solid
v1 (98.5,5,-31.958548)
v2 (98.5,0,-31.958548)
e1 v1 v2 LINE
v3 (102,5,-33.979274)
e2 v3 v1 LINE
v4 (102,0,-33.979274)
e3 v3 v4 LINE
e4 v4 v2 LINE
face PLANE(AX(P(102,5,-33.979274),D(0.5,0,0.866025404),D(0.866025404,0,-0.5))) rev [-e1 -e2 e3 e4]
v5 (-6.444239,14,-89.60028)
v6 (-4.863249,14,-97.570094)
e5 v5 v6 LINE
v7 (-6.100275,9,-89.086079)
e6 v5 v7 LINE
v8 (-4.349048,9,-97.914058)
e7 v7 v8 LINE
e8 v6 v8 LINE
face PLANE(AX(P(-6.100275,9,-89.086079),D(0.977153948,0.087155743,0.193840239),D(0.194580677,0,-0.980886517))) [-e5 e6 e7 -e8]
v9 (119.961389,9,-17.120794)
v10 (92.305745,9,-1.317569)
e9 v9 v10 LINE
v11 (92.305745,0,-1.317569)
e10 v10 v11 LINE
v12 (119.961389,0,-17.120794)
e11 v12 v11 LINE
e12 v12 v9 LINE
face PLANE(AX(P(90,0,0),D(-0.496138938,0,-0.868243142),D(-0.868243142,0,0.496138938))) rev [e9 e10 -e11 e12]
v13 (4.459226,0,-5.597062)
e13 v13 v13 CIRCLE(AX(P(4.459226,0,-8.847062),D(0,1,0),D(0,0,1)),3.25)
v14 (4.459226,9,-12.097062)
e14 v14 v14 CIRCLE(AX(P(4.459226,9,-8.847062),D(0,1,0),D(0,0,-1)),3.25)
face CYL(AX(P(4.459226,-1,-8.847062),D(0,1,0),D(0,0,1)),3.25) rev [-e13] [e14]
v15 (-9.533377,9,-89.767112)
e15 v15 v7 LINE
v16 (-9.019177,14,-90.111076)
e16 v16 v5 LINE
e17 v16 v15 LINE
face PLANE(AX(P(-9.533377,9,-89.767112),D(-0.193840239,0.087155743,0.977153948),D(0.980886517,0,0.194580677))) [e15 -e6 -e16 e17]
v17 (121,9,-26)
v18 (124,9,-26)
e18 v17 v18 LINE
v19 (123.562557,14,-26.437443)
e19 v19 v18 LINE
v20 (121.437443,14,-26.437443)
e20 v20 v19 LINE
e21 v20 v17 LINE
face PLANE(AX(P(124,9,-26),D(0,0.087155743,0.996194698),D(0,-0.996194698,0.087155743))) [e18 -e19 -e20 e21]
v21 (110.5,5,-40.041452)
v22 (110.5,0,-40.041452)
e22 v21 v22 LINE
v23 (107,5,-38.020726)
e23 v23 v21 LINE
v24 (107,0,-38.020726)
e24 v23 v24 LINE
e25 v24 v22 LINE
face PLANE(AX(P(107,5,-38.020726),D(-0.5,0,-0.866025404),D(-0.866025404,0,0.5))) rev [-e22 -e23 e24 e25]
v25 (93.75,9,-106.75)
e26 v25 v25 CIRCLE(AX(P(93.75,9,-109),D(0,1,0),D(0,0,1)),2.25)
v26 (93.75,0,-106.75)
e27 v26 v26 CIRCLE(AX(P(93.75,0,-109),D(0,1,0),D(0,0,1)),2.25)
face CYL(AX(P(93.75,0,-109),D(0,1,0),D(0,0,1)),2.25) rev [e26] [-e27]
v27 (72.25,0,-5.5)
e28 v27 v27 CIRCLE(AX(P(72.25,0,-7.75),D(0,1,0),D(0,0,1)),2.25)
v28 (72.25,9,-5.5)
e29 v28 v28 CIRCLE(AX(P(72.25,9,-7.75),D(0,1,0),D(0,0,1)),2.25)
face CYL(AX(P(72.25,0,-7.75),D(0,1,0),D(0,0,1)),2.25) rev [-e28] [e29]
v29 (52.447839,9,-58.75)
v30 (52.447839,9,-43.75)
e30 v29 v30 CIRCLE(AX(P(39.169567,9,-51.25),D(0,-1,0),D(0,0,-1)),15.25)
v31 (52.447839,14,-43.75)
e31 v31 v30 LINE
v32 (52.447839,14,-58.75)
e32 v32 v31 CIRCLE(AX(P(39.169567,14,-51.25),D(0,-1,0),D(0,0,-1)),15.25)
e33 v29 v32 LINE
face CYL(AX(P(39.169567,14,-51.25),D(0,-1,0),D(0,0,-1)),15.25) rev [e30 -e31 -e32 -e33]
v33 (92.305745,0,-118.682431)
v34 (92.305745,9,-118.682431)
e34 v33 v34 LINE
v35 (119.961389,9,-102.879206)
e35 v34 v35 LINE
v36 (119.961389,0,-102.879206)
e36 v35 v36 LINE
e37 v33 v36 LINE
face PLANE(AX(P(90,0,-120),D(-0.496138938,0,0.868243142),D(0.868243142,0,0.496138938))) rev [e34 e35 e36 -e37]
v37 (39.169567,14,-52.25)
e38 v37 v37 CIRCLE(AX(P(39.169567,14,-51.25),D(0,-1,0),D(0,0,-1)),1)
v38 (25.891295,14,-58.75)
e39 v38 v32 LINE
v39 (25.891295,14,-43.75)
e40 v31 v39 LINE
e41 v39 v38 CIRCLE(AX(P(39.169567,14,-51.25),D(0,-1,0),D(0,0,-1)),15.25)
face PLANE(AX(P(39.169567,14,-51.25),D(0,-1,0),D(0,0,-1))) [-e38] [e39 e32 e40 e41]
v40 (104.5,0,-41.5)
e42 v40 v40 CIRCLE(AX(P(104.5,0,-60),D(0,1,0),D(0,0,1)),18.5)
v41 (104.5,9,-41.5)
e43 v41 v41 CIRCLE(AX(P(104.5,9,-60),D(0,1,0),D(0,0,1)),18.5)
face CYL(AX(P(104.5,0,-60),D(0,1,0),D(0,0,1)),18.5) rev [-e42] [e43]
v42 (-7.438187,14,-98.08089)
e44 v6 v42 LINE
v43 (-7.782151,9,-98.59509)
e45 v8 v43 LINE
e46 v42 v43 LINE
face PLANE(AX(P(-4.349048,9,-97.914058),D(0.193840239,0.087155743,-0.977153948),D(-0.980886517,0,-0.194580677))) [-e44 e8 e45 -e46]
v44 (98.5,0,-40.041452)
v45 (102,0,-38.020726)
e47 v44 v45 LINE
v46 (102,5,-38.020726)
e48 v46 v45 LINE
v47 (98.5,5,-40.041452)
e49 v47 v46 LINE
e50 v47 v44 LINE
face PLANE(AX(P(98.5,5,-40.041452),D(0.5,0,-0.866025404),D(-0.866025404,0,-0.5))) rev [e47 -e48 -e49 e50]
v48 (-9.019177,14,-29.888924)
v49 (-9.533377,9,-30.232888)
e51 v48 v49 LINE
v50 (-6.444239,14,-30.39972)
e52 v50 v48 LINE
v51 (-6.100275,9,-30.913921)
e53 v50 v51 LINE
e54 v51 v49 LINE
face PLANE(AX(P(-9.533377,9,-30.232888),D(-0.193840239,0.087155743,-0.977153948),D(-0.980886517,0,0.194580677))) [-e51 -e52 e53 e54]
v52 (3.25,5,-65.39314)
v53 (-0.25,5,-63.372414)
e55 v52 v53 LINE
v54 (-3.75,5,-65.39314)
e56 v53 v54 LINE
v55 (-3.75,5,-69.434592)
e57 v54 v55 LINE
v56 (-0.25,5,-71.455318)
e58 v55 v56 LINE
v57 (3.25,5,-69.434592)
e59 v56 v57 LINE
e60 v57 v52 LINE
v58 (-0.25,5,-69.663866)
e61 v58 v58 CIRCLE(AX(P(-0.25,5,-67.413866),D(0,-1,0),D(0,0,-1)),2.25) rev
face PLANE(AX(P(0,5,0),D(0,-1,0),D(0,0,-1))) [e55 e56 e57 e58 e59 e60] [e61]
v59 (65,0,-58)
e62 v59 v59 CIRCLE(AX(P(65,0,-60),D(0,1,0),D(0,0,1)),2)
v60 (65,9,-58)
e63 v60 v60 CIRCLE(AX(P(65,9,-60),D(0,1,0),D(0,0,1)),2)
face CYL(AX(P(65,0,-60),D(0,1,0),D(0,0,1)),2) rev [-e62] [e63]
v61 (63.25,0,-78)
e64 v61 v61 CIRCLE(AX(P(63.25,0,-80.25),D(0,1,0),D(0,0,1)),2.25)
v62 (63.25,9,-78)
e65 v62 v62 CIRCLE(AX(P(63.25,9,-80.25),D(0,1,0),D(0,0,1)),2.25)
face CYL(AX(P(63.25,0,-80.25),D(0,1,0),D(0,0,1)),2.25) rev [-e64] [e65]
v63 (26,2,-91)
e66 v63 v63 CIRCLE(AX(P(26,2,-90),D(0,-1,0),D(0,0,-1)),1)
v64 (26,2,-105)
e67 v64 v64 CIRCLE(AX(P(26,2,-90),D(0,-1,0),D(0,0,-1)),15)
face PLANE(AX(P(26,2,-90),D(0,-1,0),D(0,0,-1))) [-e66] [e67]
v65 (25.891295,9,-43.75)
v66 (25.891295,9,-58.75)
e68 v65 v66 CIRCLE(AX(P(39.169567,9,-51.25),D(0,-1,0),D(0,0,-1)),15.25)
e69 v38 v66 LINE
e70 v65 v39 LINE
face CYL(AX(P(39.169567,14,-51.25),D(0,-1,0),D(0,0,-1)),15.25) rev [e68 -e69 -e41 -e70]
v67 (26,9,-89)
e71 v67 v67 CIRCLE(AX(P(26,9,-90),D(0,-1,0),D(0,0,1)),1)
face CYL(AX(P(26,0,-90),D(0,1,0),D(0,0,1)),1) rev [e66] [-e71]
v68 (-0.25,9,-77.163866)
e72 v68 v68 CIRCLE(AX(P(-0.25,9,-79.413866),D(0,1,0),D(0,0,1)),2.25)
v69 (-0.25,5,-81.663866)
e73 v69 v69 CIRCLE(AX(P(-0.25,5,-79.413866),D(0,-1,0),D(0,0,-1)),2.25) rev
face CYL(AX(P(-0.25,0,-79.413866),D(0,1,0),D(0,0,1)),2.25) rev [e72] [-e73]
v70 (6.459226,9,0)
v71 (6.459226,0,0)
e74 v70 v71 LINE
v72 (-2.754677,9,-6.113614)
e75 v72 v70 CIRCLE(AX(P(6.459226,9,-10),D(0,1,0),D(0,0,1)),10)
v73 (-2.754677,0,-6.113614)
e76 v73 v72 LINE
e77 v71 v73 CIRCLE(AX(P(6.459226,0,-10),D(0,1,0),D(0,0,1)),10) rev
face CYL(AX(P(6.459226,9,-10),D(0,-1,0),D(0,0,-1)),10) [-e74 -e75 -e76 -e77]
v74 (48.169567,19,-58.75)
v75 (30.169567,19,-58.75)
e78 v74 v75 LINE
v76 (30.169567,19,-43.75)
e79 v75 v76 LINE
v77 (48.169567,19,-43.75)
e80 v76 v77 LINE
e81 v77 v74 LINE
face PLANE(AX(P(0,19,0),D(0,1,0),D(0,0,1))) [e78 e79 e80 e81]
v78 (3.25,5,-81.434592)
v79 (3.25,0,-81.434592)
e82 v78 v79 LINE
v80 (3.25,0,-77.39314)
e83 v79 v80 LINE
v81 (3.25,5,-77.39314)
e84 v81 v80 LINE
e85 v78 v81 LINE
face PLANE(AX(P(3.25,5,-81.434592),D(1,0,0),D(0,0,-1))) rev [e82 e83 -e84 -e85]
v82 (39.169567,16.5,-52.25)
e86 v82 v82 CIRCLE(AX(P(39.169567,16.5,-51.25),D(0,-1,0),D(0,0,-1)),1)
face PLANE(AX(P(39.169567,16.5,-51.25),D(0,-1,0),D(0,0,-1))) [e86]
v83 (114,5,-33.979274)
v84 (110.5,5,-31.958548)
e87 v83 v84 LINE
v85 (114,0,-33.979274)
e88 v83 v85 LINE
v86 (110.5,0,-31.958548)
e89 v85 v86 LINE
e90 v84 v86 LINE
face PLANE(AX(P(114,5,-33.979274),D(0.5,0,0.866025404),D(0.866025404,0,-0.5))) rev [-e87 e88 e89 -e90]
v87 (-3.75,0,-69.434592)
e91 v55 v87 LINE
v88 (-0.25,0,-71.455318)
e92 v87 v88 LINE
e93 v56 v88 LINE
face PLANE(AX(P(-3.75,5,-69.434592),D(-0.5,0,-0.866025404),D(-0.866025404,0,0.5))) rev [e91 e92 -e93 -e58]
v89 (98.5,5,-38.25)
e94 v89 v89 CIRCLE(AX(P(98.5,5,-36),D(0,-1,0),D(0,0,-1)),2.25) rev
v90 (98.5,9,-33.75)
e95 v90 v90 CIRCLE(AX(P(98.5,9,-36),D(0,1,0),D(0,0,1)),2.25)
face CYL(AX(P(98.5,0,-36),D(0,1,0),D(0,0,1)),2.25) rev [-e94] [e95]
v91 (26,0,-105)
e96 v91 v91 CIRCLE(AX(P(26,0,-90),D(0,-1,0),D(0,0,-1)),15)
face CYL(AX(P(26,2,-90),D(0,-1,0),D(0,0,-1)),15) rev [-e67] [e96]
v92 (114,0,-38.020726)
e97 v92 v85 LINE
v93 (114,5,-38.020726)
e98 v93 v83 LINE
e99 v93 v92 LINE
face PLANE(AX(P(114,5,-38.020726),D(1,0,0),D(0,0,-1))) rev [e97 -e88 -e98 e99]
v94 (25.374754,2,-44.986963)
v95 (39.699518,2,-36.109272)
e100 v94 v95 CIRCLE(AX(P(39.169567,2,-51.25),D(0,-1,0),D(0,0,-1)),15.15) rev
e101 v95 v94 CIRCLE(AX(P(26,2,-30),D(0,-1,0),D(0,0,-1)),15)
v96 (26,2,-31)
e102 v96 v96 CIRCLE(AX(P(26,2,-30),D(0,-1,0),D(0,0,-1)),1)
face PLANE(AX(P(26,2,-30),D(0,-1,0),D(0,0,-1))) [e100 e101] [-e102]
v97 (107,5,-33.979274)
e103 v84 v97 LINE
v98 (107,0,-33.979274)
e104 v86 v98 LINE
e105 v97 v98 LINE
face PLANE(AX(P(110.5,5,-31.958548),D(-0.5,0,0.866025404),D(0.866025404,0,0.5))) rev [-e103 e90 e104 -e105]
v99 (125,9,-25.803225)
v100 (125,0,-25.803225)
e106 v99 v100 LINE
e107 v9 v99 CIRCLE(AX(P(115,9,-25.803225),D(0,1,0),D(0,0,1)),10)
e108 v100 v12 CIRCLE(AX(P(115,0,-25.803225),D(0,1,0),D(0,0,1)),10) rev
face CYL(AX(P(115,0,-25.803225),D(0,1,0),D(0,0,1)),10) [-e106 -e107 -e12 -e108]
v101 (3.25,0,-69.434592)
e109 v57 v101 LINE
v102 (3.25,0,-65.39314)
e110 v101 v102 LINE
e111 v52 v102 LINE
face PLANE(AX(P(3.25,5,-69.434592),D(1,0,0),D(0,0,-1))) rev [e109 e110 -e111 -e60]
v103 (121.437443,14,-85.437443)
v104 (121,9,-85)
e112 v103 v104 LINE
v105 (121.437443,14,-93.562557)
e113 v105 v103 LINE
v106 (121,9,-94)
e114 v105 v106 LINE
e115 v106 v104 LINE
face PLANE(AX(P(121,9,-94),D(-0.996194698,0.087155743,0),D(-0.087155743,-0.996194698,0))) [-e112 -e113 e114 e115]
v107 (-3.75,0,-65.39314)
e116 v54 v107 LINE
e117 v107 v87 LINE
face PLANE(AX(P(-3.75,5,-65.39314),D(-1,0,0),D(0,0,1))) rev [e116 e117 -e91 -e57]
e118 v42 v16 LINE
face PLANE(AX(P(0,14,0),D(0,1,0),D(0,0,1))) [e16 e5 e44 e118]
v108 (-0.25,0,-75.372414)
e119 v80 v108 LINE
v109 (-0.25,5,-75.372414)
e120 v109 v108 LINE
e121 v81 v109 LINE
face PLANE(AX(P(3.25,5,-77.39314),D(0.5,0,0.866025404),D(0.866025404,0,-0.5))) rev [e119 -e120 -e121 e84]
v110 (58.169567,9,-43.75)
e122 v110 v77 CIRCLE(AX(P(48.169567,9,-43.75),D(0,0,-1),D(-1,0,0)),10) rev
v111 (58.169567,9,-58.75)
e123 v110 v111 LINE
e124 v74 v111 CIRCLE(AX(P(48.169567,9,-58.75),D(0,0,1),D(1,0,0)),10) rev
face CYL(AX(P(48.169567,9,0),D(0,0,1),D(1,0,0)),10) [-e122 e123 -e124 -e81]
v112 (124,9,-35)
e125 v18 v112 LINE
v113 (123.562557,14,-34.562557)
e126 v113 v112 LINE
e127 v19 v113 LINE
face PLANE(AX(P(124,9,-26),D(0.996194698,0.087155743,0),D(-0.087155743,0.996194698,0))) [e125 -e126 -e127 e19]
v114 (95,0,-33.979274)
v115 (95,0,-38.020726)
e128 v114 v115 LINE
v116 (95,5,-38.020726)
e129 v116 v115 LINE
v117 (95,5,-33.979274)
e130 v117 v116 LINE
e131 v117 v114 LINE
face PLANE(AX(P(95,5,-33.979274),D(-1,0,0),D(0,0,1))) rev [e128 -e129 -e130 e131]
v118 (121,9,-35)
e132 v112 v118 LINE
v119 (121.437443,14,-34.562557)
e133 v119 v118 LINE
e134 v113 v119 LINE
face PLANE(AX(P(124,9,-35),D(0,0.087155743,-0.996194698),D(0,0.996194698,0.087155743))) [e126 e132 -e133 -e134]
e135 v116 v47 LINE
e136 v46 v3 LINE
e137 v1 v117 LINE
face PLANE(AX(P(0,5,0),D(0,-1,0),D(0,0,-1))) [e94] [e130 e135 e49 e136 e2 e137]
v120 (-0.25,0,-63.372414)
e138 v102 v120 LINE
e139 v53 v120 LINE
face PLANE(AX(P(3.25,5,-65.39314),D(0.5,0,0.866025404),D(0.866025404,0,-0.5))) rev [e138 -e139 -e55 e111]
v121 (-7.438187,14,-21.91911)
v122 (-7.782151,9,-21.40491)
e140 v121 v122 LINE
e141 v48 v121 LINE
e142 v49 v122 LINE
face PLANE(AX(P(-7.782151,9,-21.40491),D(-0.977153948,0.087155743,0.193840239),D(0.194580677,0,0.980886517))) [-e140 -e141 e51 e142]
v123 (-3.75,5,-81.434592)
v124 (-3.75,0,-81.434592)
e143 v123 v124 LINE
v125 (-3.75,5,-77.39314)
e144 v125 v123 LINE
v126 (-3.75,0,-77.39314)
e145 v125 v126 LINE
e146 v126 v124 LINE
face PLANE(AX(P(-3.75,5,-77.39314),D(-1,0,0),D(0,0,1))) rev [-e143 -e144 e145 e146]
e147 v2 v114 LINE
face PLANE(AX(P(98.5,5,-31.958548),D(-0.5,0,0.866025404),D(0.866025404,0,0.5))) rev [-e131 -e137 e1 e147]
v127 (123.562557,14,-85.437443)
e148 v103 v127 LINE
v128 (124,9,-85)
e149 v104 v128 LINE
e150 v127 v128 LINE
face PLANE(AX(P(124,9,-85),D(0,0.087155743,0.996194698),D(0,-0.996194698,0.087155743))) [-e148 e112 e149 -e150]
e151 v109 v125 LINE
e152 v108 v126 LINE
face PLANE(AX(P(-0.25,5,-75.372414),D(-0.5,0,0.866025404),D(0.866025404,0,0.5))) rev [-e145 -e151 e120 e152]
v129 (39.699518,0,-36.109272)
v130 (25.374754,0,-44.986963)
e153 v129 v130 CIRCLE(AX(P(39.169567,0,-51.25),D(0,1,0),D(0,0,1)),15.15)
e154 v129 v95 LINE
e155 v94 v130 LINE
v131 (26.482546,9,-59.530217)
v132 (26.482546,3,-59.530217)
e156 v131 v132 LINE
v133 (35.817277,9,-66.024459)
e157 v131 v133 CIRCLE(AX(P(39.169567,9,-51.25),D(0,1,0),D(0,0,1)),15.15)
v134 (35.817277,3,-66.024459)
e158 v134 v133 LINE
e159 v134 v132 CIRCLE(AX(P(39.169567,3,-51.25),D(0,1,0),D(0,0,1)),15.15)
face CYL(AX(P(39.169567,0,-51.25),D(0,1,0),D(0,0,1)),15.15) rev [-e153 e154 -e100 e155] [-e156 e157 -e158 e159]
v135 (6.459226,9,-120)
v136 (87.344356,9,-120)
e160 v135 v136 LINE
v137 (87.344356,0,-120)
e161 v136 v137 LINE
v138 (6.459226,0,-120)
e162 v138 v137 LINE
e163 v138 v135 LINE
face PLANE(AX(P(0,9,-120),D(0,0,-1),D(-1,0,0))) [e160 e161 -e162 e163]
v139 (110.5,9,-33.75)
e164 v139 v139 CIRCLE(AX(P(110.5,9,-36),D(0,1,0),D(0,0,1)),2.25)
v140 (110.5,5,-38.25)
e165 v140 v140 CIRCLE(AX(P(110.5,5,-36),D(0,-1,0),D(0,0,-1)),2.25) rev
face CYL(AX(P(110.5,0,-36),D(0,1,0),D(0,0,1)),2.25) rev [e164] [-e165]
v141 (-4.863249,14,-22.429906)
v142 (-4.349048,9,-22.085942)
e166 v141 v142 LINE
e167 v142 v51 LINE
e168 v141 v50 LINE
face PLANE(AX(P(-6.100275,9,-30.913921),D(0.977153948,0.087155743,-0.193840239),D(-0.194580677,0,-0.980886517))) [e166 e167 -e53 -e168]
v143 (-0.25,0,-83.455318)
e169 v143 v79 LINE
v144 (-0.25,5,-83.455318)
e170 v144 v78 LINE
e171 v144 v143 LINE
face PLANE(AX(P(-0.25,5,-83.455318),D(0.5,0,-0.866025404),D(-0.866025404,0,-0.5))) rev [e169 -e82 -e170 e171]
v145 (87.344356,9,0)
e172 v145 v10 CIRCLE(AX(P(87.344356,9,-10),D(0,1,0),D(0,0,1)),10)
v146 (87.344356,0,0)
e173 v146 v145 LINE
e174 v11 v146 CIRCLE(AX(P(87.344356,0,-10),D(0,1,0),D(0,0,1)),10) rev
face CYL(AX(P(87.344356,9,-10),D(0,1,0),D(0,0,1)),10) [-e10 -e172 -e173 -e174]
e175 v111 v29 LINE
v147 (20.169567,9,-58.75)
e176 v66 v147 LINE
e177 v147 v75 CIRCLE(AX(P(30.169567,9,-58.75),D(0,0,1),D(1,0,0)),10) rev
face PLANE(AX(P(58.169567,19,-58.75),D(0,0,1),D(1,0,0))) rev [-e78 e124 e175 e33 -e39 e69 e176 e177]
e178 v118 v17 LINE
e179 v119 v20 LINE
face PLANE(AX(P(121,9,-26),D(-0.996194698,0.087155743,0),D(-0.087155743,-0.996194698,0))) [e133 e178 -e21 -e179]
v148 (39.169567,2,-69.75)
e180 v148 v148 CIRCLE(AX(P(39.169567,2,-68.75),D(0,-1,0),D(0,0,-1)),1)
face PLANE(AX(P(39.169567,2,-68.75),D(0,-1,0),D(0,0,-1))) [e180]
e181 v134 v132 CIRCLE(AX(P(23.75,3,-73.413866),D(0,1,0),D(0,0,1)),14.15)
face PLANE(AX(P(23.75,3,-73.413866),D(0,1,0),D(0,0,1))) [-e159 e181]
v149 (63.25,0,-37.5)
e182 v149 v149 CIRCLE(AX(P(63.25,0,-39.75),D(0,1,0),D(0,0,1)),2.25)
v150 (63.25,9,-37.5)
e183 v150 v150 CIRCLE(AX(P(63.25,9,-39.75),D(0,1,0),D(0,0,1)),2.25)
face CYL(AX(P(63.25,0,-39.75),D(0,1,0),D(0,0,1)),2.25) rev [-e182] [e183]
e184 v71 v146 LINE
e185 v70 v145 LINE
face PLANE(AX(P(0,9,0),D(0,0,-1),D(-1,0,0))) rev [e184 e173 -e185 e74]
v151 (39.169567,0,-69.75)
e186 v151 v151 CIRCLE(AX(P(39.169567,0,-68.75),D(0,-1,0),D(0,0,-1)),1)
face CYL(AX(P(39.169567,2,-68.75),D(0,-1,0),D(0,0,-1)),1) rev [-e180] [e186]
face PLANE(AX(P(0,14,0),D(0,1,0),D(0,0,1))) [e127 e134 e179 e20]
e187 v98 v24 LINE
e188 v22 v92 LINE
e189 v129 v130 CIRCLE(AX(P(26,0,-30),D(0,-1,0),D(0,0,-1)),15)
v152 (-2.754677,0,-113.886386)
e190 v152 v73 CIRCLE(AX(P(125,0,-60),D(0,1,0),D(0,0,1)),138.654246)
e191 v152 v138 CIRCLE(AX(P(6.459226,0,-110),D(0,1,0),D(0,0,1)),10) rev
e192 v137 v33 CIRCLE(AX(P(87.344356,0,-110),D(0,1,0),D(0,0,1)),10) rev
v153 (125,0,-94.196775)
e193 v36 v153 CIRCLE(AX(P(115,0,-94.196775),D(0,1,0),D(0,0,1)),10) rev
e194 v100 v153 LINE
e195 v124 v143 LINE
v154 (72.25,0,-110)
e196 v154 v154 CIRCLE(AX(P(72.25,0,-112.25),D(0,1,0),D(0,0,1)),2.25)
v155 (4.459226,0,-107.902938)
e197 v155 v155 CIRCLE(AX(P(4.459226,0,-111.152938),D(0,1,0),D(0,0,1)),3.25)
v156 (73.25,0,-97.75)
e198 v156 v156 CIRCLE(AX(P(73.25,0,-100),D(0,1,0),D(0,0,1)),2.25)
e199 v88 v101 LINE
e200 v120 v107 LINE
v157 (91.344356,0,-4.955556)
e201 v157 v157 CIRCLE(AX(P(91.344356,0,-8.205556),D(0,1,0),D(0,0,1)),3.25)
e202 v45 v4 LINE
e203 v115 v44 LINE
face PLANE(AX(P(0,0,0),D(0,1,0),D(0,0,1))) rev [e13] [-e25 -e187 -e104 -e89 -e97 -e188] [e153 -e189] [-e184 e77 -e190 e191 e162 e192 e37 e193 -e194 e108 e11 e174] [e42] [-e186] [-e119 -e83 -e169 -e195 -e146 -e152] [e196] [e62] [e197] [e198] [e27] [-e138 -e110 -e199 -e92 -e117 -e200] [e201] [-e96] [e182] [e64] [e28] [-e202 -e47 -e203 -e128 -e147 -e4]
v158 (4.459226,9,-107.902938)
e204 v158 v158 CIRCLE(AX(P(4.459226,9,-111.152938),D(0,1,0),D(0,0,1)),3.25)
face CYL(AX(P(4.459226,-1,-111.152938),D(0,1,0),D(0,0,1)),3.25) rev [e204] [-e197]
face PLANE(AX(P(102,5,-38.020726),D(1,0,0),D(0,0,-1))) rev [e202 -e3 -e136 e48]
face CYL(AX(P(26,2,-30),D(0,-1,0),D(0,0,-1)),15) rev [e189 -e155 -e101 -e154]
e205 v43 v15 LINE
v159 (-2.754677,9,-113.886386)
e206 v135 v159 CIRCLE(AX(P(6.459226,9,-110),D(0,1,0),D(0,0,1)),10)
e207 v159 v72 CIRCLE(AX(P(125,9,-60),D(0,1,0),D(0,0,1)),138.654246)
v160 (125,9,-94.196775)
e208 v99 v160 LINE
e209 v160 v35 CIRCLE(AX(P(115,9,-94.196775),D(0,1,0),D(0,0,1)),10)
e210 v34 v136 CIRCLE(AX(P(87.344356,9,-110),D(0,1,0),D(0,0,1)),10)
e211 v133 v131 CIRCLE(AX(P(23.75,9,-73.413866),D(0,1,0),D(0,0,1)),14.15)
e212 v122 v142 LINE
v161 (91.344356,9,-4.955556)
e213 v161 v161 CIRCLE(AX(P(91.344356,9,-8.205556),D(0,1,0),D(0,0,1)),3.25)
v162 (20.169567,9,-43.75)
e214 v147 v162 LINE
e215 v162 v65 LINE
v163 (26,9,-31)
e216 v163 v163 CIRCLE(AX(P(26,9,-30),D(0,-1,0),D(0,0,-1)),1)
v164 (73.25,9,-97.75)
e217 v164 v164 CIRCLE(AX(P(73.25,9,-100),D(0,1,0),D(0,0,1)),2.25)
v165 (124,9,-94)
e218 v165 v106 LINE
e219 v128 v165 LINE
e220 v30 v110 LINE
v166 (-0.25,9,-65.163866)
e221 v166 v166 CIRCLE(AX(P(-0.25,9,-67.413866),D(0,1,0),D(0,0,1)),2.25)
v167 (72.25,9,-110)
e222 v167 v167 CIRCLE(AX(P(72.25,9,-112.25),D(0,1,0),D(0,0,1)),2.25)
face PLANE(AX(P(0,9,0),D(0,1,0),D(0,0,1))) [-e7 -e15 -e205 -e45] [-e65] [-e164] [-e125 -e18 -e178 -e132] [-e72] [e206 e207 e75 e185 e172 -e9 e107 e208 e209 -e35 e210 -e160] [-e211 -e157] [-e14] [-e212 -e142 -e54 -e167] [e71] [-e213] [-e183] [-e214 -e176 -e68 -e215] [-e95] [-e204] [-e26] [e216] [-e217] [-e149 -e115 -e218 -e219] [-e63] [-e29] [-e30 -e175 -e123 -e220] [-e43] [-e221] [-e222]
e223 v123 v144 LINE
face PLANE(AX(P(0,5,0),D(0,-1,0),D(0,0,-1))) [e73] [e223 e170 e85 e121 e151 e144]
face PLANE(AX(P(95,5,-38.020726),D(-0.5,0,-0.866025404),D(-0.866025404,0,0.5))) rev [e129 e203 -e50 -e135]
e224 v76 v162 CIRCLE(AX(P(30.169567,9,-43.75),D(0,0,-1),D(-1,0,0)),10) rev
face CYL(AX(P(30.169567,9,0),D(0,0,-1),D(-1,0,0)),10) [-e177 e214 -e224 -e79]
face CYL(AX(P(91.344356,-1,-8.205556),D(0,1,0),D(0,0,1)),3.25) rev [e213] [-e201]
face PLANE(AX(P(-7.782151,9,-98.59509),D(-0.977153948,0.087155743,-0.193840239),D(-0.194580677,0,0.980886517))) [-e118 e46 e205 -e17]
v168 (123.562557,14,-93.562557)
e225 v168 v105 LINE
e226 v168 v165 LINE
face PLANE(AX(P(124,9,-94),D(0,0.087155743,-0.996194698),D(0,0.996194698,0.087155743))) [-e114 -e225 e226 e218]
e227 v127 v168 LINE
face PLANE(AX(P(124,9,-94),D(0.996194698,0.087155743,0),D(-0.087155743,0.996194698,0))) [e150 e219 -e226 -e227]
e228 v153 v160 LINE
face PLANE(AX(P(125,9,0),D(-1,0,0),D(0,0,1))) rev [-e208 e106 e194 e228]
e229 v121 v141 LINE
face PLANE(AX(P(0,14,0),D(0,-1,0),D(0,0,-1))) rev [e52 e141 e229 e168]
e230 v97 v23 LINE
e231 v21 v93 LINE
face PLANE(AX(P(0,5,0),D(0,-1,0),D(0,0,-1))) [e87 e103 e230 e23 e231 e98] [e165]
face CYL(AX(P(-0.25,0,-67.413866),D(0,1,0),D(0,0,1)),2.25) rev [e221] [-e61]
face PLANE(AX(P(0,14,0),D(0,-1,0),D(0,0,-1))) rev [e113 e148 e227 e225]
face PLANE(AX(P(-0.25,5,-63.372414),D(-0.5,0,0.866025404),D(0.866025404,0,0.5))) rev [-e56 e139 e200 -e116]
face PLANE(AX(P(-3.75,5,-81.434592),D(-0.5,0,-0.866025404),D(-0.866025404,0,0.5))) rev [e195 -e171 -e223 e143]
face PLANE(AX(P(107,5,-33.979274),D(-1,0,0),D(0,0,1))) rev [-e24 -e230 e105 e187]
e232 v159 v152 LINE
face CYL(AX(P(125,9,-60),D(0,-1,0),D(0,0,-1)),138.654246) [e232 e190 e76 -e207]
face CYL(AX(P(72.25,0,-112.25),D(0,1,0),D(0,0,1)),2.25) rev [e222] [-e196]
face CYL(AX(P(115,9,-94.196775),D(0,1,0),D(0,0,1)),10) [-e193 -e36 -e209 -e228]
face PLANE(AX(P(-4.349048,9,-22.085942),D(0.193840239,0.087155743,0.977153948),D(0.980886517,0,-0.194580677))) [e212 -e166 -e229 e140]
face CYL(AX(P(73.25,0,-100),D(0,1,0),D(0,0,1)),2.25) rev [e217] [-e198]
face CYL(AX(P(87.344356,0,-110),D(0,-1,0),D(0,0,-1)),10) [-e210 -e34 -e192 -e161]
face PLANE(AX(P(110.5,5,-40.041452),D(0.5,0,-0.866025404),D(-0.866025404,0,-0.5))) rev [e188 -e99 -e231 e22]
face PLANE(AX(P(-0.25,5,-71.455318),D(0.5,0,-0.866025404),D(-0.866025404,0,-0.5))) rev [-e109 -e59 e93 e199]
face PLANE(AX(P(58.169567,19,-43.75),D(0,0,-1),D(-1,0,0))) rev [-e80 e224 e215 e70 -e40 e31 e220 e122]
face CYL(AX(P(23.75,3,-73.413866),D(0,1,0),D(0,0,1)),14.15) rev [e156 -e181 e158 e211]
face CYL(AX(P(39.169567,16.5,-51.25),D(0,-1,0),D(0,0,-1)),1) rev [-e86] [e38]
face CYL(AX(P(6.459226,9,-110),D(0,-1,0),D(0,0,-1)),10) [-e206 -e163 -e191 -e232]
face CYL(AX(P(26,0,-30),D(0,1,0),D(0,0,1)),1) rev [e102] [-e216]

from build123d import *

# Parameters (mm, degrees)
SKETCH1_W                         = 125
SKETCH1_H                         = 120
TOP_BASE_DEPTH                    = 9
SKETCH5_R                         = 14.15
DRIVE_GEAR_HOLE_DEPTH             = 6
SKETCH28_R                        = 15.15
TWO_STAGE_GEAR_HOLE_DEPTH         = 174.51080658
SKETCH8_R                         = 18.5
XL320_FINGER_KNUCKLE_MOUNT_DEPTH  = 174.51080658
SKETCH26_R                        = 1
STRING_HOLES_DEPTH                = 174.51080658
XL320_MOUNT_HOLES_R               = 2.25
XL320_MOUNT_HOLES_M4_DEPTH        = 174.51080658
AX12_MOUNT_HOLES_R                = 2.25
AX12_MOUNT_HOLES_M4_DEPTH         = 174.51080658
NUTS_M4_DEPTH                     = 5
SKETCH34_R                        = 15
HOLES_FOR_M4_IN_FINGER_GEAR_DEPTH = 2
SKETCH31_W                        = 38
SKETCH31_H                        = 15
BOSS_EXTRUDE1_DEPTH               = 10
SKETCH32_R                        = 15.25
CUT_EXTRUDE5_DEPTH                = 5
SKETCH33_R                        = 1
CUT_EXTRUDE6_DEPTH                = 2.5
FILLET2_R                         = 10
CUT_EXTRUDE8_DEPTH                = 174.565549577
FILLET4_R                         = 10
SKETCH37_R                        = 3.25
CONNECT_HOLES_M6_DEPTH            = 10
SKETCH41_R                        = 2
CONNECT_TO_HOUSE_M4_DEPTH         = 174.565549577
SKETCH42_W                        = 3
SKETCH42_H                        = 9
HOUSING_FITS_DEPTH                = 5
HOUSING_FITS_DRAFT                = 5
HOUSING_FITS_PROFILE_2_DEPTH      = 5
HOUSING_FITS_PROFILE_2_DRAFT      = 5
HOUSING_FITS_PROFILE_3_DEPTH      = 5
HOUSING_FITS_PROFILE_3_DRAFT      = 5
HOUSING_FITS_PROFILE_4_DEPTH      = 5
HOUSING_FITS_PROFILE_4_DRAFT      = 5
SKETCH43_R                        = 1
M2_SHAFT_HOLE_DEPTH               = 2


with BuildPart() as part:
    # Sketch1 → Top_Base (new body)
    with BuildSketch(Plane(origin=(0, 0, 0), x_dir=(1, 0, 0), z_dir=(0, 1, 0))):
        with BuildLine():
            ThreePointArc((0, 120), (-13.654246239, 60), (0, 0))
            Line((0, 0), (0, 120))
        make_face()
        with Locations((62.5, 60)):
            Rectangle(SKETCH1_W, SKETCH1_H)
    extrude(amount=TOP_BASE_DEPTH)

    # Sketch5 → Drive_Gear_Hole (cut)
    with BuildSketch(Plane(origin=(0, 9, 0), x_dir=(1, 0, 0), z_dir=(0, 1, 0))):
        with Locations(Location((23.75, 73.41386581, 0), (0, 0, 270))):
            Circle(SKETCH5_R)
    extrude(amount=-DRIVE_GEAR_HOLE_DEPTH, mode=Mode.SUBTRACT)

    # Sketch28 → Two_Stage_Gear_Hole (cut, through all)
    with BuildSketch(Plane(origin=(0, 9, 0), x_dir=(1, 0, 0), z_dir=(0, 1, 0))):
        with Locations(Location((39.169567191, 51.25, 0), (0, 0, 270))):
            Circle(SKETCH28_R)
    extrude(amount=-TWO_STAGE_GEAR_HOLE_DEPTH, mode=Mode.SUBTRACT)

    # Sketch8 → XL320_Finger_Knuckle_Mount (cut, through all)
    with BuildSketch(Plane(origin=(0, 9, 0), x_dir=(1, 0, 0), z_dir=(0, 1, 0))):
        with Locations(Location((104.5, 60, 0), (0, 0, 270))):
            Circle(SKETCH8_R)
    extrude(amount=-XL320_FINGER_KNUCKLE_MOUNT_DEPTH, mode=Mode.SUBTRACT)

    # Sketch26 → String_Holes (cut, through all)
    with BuildSketch(Plane.XZ.offset(-9)):
        with Locations(Location((26, -30, 0), (0, 0, 270))):
            Circle(SKETCH26_R)
        with Locations(Location((26, -90, 0), (0, 0, 90))):
            Circle(SKETCH26_R)
    extrude(amount=STRING_HOLES_DEPTH, mode=Mode.SUBTRACT)

    # XL320_Mount_Holes → XL320_Mount_Holes_(M4) (cut, through all)
    with BuildSketch(Plane(origin=(0, 9, 0), x_dir=(1, 0, 0), z_dir=(0, 1, 0))):
        with Locations(Location((110.5, 36, 0), (0, 0, 270))):
            Circle(XL320_MOUNT_HOLES_R)
        with Locations(Location((98.5, 36, 0), (0, 0, 270))):
            Circle(XL320_MOUNT_HOLES_R)
        with Locations(Location((-0.25, 79.41386581, 0), (0, 0, 270))):
            Circle(XL320_MOUNT_HOLES_R)
        with Locations(Location((-0.25, 67.41386581, 0), (0, 0, 270))):
            Circle(XL320_MOUNT_HOLES_R)
    extrude(amount=-XL320_MOUNT_HOLES_M4_DEPTH, mode=Mode.SUBTRACT)

    # AX12_Mount_Holes → AX12_Mount_Holes_(M4) (cut, through all)
    with BuildSketch(Plane(origin=(0, 9, 0), x_dir=(1, 0, 0), z_dir=(0, 1, 0))):
        with Locations(Location((72.25, 112.25, 0), (0, 0, 270))):
            Circle(AX12_MOUNT_HOLES_R)
        with Locations(Location((63.25, 80.25, 0), (0, 0, 270))):
            Circle(AX12_MOUNT_HOLES_R)
        with Locations(Location((73.25, 100, 0), (0, 0, 270))):
            Circle(AX12_MOUNT_HOLES_R)
        with Locations(Location((93.75, 109, 0), (0, 0, 270))):
            Circle(AX12_MOUNT_HOLES_R)
        with Locations(Location((63.25, 39.75, 0), (0, 0, 270))):
            Circle(AX12_MOUNT_HOLES_R)
        with Locations(Location((72.25, 7.75, 0), (0, 0, 270))):
            Circle(AX12_MOUNT_HOLES_R)
    extrude(amount=-AX12_MOUNT_HOLES_M4_DEPTH, mode=Mode.SUBTRACT)

    # Sketch27 → Nuts_(M4) (cut)
    with BuildSketch(Plane.XZ):
        Polygon((110.5, -31.958548116), (107, -33.979274058), (107, -38.020725942), (110.5, -40.041451884), (114, -38.020725942), (114, -33.979274058), align=None)
        Polygon((98.5, -31.958548116), (95, -33.979274058), (95, -38.020725942), (98.5, -40.041451884), (102, -38.020725942), (102, -33.979274058), align=None)
        Polygon((3.25, -65.393139868), (-0.25, -63.372413926), (-3.75, -65.393139868), (-3.75, -69.434591752), (-0.25, -71.455317694), (3.25, -69.434591752), align=None)
        Polygon((-3.75, -77.393139868), (-3.75, -81.434591752), (-0.25, -83.455317694), (3.25, -81.434591752), (3.25, -77.393139868), (-0.25, -75.372413926), align=None)
    extrude(amount=-NUTS_M4_DEPTH, mode=Mode.SUBTRACT)

    # Sketch34 → Holes_For_M4_In_Finger_Gear (cut)
    with BuildSketch(Plane.XZ):
        with Locations((26, -30)):
            Circle(SKETCH34_R)
        with Locations(Location((26, -90, 0), (0, 0, 270))):
            Circle(SKETCH34_R)
    extrude(amount=-HOLES_FOR_M4_IN_FINGER_GEAR_DEPTH, mode=Mode.SUBTRACT)

    # Sketch31 → Boss-Extrude1 (add)
    with BuildSketch(Plane(origin=(0, 9, 0), x_dir=(1, 0, 0), z_dir=(0, 1, 0))):
        with Locations((39.169567191, 51.25)):
            Rectangle(SKETCH31_W, SKETCH31_H)
    extrude(amount=BOSS_EXTRUDE1_DEPTH)

    # Sketch32 → Cut-Extrude5 (cut)
    with BuildSketch(Plane.XZ.offset(-9)):
        with Locations((39.169567191, -51.25)):
            Circle(SKETCH32_R)
    extrude(amount=-CUT_EXTRUDE5_DEPTH, mode=Mode.SUBTRACT)

    # Sketch33 → Cut-Extrude6 (cut)
    with BuildSketch(Plane.XZ.offset(-14)):
        with Locations(Location((39.169567191, -51.25, 0), (0, 0, 270))):
            Circle(SKETCH33_R)
    extrude(amount=-CUT_EXTRUDE6_DEPTH, mode=Mode.SUBTRACT)

    # Fillet2
    fillet2_edges = [part.edges().sort_by_distance(p)[0] for p in [
        (58.169567191, 19, -51.25),
        (20.169567191, 19, -51.25),
    ]]
    fillet(fillet2_edges, radius=FILLET2_R - 0.0001)  # a hair under: the kernel refuses the full size

    # Sketch36 → Cut-Extrude8 (cut, through all)
    with BuildSketch(Plane(origin=(0, 9, 0), x_dir=(1, 0, 0), z_dir=(0, 1, 0))):
        Polygon((90, 120), (125, 100), (125, 120), align=None)
        Polygon((125, 0), (90, 0), (125, 20), align=None)
    extrude(amount=-CUT_EXTRUDE8_DEPTH, mode=Mode.SUBTRACT)

    # Fillet4
    fillet4_edges = [part.edges().sort_by_distance(p)[0] for p in [
        (90, 4.5, -120),
        (125, 4.5, -100),
        (125, 4.5, -20),
        (90, 4.5, 0),
        (0, 4.5, -120),
        (0, 4.5, 0),
    ]]
    fillet(fillet4_edges, radius=FILLET4_R)

    # Sketch37 → Connect_Holes_(M6) (cut)
    with BuildSketch(Plane(origin=(0, 9, 0), x_dir=(1, 0, 0), z_dir=(0, 1, 0))):
        with Locations(Location((4.459226107, 111.152938298, 0), (0, 0, 270))):
            Circle(SKETCH37_R)
        with Locations(Location((4.459226107, 8.847061702, 0), (0, 0, 270))):
            Circle(SKETCH37_R)
        with Locations(Location((91.344355629, 8.205555711, 0), (0, 0, 270))):
            Circle(SKETCH37_R)
    extrude(amount=-CONNECT_HOLES_M6_DEPTH, mode=Mode.SUBTRACT)

    # Sketch41 → Connect_To_House_(M4) (cut, through all)
    with BuildSketch(Plane(origin=(0, 9, 0), x_dir=(1, 0, 0), z_dir=(0, 1, 0))):
        with Locations(Location((65, 60, 0), (0, 0, 270))):
            Circle(SKETCH41_R)
    extrude(amount=-CONNECT_TO_HOUSE_M4_DEPTH, mode=Mode.SUBTRACT)


with BuildPart() as housing_fits_tool:
    # Sketch42 → Housing_Fits (with draft: the straight prism first)
    with BuildSketch(Plane(origin=(0, 9, 0), x_dir=(1, 0, 0), z_dir=(0, 1, 0))):
        with Locations((122.5, 30.5)):
            Rectangle(SKETCH42_W, SKETCH42_H)
    extrude(amount=HOUSING_FITS_DEPTH)
    # Housing_Fits: the draft: its side faces are tilted about the plane it starts from
    housing_fits_sides = [housing_fits_tool.faces().sort_by_distance(p)[0] for p in [
        (124, 11.5, -30.5),
        (122.5, 11.5, -35),
        (121, 11.5, -30.5),
        (122.5, 11.5, -26),
    ]]
    draft(housing_fits_sides, Plane(origin=(0, 9, 0), x_dir=(1, 0, 0), z_dir=(0, 1, 0)), HOUSING_FITS_DRAFT)


with BuildPart() as part_1:
    add(part.part)

    # Housing_Fits: add housing_fits_tool
    add(housing_fits_tool.part)


with BuildPart() as housing_fits_profile_2_tool:
    # Sketch42 → Housing_Fits profile 2 (with draft: the straight prism first)
    with BuildSketch(Plane(origin=(0, 9, 0), x_dir=(1, 0, 0), z_dir=(0, 1, 0))):
        Polygon((-9.533377338, 30.232888291), (-7.782151246, 21.404909633), (-4.349048435, 22.085942002), (-6.100274527, 30.91392066), align=None)
    extrude(amount=HOUSING_FITS_PROFILE_2_DEPTH)
    # Housing_Fits profile 2: the draft: its side faces are tilted about the plane it starts from
    housing_fits_profile_2_sides = [housing_fits_profile_2_tool.faces().sort_by_distance(p)[0] for p in [
        (-8.657764292, 11.5, -25.818898962),
        (-6.065599841, 11.5, -21.745425818),
        (-5.224661481, 11.5, -26.499931331),
        (-7.816825933, 11.5, -30.573404475),
    ]]
    draft(housing_fits_profile_2_sides, Plane(origin=(0, 9, 0), x_dir=(1, 0, 0), z_dir=(0, 1, 0)), HOUSING_FITS_PROFILE_2_DRAFT)


with BuildPart() as part_2:
    add(part_1.part)

    # Housing_Fits profile 2: add housing_fits_profile_2_tool
    add(housing_fits_profile_2_tool.part)


with BuildPart() as housing_fits_profile_3_tool:
    # Sketch42 → Housing_Fits profile 3 (with draft: the straight prism first)
    with BuildSketch(Plane(origin=(0, 9, 0), x_dir=(1, 0, 0), z_dir=(0, 1, 0))):
        Polygon((-4.349048435, 97.914057998), (-7.782151246, 98.595090367), (-9.533377338, 89.767111709), (-6.100274527, 89.08607934), align=None)
    extrude(amount=HOUSING_FITS_PROFILE_3_DEPTH)
    # Housing_Fits profile 3: the draft: its side faces are tilted about the plane it starts from
    housing_fits_profile_3_sides = [housing_fits_profile_3_tool.faces().sort_by_distance(p)[0] for p in [
        (-6.065599841, 11.5, -98.254574182),
        (-8.657764292, 11.5, -94.181101038),
        (-7.816825933, 11.5, -89.426595525),
        (-5.224661481, 11.5, -93.500068669),
    ]]
    draft(housing_fits_profile_3_sides, Plane(origin=(0, 9, 0), x_dir=(1, 0, 0), z_dir=(0, 1, 0)), HOUSING_FITS_PROFILE_3_DRAFT)


with BuildPart() as part_3:
    add(part_2.part)

    # Housing_Fits profile 3: add housing_fits_profile_3_tool
    add(housing_fits_profile_3_tool.part)


with BuildPart() as housing_fits_profile_4_tool:
    # Sketch42 → Housing_Fits profile 4 (with draft: the straight prism first)
    with BuildSketch(Plane(origin=(0, 9, 0), x_dir=(1, 0, 0), z_dir=(0, 1, 0))):
        with Locations((122.5, 89.5)):
            Rectangle(SKETCH42_W, SKETCH42_H)
    extrude(amount=HOUSING_FITS_PROFILE_4_DEPTH)
    # Housing_Fits profile 4: the draft: its side faces are tilted about the plane it starts from
    housing_fits_profile_4_sides = [housing_fits_profile_4_tool.faces().sort_by_distance(p)[0] for p in [
        (122.5, 11.5, -94),
        (121, 11.5, -89.5),
        (122.5, 11.5, -85),
        (124, 11.5, -89.5),
    ]]
    draft(housing_fits_profile_4_sides, Plane(origin=(0, 9, 0), x_dir=(1, 0, 0), z_dir=(0, 1, 0)), HOUSING_FITS_PROFILE_4_DRAFT)


with BuildPart() as part_4:
    add(part_3.part)

    # Housing_Fits profile 4: add housing_fits_profile_4_tool
    add(housing_fits_profile_4_tool.part)

    # Sketch43 → M2_Shaft_Hole (cut)
    with BuildSketch(Plane.XZ):
        with Locations(Location((39.169567191, -68.75, 0), (0, 0, 270))):
            Circle(SKETCH43_R)
    extrude(amount=-M2_SHAFT_HOLE_DEPTH, mode=Mode.SUBTRACT)


solid = part_4.part
